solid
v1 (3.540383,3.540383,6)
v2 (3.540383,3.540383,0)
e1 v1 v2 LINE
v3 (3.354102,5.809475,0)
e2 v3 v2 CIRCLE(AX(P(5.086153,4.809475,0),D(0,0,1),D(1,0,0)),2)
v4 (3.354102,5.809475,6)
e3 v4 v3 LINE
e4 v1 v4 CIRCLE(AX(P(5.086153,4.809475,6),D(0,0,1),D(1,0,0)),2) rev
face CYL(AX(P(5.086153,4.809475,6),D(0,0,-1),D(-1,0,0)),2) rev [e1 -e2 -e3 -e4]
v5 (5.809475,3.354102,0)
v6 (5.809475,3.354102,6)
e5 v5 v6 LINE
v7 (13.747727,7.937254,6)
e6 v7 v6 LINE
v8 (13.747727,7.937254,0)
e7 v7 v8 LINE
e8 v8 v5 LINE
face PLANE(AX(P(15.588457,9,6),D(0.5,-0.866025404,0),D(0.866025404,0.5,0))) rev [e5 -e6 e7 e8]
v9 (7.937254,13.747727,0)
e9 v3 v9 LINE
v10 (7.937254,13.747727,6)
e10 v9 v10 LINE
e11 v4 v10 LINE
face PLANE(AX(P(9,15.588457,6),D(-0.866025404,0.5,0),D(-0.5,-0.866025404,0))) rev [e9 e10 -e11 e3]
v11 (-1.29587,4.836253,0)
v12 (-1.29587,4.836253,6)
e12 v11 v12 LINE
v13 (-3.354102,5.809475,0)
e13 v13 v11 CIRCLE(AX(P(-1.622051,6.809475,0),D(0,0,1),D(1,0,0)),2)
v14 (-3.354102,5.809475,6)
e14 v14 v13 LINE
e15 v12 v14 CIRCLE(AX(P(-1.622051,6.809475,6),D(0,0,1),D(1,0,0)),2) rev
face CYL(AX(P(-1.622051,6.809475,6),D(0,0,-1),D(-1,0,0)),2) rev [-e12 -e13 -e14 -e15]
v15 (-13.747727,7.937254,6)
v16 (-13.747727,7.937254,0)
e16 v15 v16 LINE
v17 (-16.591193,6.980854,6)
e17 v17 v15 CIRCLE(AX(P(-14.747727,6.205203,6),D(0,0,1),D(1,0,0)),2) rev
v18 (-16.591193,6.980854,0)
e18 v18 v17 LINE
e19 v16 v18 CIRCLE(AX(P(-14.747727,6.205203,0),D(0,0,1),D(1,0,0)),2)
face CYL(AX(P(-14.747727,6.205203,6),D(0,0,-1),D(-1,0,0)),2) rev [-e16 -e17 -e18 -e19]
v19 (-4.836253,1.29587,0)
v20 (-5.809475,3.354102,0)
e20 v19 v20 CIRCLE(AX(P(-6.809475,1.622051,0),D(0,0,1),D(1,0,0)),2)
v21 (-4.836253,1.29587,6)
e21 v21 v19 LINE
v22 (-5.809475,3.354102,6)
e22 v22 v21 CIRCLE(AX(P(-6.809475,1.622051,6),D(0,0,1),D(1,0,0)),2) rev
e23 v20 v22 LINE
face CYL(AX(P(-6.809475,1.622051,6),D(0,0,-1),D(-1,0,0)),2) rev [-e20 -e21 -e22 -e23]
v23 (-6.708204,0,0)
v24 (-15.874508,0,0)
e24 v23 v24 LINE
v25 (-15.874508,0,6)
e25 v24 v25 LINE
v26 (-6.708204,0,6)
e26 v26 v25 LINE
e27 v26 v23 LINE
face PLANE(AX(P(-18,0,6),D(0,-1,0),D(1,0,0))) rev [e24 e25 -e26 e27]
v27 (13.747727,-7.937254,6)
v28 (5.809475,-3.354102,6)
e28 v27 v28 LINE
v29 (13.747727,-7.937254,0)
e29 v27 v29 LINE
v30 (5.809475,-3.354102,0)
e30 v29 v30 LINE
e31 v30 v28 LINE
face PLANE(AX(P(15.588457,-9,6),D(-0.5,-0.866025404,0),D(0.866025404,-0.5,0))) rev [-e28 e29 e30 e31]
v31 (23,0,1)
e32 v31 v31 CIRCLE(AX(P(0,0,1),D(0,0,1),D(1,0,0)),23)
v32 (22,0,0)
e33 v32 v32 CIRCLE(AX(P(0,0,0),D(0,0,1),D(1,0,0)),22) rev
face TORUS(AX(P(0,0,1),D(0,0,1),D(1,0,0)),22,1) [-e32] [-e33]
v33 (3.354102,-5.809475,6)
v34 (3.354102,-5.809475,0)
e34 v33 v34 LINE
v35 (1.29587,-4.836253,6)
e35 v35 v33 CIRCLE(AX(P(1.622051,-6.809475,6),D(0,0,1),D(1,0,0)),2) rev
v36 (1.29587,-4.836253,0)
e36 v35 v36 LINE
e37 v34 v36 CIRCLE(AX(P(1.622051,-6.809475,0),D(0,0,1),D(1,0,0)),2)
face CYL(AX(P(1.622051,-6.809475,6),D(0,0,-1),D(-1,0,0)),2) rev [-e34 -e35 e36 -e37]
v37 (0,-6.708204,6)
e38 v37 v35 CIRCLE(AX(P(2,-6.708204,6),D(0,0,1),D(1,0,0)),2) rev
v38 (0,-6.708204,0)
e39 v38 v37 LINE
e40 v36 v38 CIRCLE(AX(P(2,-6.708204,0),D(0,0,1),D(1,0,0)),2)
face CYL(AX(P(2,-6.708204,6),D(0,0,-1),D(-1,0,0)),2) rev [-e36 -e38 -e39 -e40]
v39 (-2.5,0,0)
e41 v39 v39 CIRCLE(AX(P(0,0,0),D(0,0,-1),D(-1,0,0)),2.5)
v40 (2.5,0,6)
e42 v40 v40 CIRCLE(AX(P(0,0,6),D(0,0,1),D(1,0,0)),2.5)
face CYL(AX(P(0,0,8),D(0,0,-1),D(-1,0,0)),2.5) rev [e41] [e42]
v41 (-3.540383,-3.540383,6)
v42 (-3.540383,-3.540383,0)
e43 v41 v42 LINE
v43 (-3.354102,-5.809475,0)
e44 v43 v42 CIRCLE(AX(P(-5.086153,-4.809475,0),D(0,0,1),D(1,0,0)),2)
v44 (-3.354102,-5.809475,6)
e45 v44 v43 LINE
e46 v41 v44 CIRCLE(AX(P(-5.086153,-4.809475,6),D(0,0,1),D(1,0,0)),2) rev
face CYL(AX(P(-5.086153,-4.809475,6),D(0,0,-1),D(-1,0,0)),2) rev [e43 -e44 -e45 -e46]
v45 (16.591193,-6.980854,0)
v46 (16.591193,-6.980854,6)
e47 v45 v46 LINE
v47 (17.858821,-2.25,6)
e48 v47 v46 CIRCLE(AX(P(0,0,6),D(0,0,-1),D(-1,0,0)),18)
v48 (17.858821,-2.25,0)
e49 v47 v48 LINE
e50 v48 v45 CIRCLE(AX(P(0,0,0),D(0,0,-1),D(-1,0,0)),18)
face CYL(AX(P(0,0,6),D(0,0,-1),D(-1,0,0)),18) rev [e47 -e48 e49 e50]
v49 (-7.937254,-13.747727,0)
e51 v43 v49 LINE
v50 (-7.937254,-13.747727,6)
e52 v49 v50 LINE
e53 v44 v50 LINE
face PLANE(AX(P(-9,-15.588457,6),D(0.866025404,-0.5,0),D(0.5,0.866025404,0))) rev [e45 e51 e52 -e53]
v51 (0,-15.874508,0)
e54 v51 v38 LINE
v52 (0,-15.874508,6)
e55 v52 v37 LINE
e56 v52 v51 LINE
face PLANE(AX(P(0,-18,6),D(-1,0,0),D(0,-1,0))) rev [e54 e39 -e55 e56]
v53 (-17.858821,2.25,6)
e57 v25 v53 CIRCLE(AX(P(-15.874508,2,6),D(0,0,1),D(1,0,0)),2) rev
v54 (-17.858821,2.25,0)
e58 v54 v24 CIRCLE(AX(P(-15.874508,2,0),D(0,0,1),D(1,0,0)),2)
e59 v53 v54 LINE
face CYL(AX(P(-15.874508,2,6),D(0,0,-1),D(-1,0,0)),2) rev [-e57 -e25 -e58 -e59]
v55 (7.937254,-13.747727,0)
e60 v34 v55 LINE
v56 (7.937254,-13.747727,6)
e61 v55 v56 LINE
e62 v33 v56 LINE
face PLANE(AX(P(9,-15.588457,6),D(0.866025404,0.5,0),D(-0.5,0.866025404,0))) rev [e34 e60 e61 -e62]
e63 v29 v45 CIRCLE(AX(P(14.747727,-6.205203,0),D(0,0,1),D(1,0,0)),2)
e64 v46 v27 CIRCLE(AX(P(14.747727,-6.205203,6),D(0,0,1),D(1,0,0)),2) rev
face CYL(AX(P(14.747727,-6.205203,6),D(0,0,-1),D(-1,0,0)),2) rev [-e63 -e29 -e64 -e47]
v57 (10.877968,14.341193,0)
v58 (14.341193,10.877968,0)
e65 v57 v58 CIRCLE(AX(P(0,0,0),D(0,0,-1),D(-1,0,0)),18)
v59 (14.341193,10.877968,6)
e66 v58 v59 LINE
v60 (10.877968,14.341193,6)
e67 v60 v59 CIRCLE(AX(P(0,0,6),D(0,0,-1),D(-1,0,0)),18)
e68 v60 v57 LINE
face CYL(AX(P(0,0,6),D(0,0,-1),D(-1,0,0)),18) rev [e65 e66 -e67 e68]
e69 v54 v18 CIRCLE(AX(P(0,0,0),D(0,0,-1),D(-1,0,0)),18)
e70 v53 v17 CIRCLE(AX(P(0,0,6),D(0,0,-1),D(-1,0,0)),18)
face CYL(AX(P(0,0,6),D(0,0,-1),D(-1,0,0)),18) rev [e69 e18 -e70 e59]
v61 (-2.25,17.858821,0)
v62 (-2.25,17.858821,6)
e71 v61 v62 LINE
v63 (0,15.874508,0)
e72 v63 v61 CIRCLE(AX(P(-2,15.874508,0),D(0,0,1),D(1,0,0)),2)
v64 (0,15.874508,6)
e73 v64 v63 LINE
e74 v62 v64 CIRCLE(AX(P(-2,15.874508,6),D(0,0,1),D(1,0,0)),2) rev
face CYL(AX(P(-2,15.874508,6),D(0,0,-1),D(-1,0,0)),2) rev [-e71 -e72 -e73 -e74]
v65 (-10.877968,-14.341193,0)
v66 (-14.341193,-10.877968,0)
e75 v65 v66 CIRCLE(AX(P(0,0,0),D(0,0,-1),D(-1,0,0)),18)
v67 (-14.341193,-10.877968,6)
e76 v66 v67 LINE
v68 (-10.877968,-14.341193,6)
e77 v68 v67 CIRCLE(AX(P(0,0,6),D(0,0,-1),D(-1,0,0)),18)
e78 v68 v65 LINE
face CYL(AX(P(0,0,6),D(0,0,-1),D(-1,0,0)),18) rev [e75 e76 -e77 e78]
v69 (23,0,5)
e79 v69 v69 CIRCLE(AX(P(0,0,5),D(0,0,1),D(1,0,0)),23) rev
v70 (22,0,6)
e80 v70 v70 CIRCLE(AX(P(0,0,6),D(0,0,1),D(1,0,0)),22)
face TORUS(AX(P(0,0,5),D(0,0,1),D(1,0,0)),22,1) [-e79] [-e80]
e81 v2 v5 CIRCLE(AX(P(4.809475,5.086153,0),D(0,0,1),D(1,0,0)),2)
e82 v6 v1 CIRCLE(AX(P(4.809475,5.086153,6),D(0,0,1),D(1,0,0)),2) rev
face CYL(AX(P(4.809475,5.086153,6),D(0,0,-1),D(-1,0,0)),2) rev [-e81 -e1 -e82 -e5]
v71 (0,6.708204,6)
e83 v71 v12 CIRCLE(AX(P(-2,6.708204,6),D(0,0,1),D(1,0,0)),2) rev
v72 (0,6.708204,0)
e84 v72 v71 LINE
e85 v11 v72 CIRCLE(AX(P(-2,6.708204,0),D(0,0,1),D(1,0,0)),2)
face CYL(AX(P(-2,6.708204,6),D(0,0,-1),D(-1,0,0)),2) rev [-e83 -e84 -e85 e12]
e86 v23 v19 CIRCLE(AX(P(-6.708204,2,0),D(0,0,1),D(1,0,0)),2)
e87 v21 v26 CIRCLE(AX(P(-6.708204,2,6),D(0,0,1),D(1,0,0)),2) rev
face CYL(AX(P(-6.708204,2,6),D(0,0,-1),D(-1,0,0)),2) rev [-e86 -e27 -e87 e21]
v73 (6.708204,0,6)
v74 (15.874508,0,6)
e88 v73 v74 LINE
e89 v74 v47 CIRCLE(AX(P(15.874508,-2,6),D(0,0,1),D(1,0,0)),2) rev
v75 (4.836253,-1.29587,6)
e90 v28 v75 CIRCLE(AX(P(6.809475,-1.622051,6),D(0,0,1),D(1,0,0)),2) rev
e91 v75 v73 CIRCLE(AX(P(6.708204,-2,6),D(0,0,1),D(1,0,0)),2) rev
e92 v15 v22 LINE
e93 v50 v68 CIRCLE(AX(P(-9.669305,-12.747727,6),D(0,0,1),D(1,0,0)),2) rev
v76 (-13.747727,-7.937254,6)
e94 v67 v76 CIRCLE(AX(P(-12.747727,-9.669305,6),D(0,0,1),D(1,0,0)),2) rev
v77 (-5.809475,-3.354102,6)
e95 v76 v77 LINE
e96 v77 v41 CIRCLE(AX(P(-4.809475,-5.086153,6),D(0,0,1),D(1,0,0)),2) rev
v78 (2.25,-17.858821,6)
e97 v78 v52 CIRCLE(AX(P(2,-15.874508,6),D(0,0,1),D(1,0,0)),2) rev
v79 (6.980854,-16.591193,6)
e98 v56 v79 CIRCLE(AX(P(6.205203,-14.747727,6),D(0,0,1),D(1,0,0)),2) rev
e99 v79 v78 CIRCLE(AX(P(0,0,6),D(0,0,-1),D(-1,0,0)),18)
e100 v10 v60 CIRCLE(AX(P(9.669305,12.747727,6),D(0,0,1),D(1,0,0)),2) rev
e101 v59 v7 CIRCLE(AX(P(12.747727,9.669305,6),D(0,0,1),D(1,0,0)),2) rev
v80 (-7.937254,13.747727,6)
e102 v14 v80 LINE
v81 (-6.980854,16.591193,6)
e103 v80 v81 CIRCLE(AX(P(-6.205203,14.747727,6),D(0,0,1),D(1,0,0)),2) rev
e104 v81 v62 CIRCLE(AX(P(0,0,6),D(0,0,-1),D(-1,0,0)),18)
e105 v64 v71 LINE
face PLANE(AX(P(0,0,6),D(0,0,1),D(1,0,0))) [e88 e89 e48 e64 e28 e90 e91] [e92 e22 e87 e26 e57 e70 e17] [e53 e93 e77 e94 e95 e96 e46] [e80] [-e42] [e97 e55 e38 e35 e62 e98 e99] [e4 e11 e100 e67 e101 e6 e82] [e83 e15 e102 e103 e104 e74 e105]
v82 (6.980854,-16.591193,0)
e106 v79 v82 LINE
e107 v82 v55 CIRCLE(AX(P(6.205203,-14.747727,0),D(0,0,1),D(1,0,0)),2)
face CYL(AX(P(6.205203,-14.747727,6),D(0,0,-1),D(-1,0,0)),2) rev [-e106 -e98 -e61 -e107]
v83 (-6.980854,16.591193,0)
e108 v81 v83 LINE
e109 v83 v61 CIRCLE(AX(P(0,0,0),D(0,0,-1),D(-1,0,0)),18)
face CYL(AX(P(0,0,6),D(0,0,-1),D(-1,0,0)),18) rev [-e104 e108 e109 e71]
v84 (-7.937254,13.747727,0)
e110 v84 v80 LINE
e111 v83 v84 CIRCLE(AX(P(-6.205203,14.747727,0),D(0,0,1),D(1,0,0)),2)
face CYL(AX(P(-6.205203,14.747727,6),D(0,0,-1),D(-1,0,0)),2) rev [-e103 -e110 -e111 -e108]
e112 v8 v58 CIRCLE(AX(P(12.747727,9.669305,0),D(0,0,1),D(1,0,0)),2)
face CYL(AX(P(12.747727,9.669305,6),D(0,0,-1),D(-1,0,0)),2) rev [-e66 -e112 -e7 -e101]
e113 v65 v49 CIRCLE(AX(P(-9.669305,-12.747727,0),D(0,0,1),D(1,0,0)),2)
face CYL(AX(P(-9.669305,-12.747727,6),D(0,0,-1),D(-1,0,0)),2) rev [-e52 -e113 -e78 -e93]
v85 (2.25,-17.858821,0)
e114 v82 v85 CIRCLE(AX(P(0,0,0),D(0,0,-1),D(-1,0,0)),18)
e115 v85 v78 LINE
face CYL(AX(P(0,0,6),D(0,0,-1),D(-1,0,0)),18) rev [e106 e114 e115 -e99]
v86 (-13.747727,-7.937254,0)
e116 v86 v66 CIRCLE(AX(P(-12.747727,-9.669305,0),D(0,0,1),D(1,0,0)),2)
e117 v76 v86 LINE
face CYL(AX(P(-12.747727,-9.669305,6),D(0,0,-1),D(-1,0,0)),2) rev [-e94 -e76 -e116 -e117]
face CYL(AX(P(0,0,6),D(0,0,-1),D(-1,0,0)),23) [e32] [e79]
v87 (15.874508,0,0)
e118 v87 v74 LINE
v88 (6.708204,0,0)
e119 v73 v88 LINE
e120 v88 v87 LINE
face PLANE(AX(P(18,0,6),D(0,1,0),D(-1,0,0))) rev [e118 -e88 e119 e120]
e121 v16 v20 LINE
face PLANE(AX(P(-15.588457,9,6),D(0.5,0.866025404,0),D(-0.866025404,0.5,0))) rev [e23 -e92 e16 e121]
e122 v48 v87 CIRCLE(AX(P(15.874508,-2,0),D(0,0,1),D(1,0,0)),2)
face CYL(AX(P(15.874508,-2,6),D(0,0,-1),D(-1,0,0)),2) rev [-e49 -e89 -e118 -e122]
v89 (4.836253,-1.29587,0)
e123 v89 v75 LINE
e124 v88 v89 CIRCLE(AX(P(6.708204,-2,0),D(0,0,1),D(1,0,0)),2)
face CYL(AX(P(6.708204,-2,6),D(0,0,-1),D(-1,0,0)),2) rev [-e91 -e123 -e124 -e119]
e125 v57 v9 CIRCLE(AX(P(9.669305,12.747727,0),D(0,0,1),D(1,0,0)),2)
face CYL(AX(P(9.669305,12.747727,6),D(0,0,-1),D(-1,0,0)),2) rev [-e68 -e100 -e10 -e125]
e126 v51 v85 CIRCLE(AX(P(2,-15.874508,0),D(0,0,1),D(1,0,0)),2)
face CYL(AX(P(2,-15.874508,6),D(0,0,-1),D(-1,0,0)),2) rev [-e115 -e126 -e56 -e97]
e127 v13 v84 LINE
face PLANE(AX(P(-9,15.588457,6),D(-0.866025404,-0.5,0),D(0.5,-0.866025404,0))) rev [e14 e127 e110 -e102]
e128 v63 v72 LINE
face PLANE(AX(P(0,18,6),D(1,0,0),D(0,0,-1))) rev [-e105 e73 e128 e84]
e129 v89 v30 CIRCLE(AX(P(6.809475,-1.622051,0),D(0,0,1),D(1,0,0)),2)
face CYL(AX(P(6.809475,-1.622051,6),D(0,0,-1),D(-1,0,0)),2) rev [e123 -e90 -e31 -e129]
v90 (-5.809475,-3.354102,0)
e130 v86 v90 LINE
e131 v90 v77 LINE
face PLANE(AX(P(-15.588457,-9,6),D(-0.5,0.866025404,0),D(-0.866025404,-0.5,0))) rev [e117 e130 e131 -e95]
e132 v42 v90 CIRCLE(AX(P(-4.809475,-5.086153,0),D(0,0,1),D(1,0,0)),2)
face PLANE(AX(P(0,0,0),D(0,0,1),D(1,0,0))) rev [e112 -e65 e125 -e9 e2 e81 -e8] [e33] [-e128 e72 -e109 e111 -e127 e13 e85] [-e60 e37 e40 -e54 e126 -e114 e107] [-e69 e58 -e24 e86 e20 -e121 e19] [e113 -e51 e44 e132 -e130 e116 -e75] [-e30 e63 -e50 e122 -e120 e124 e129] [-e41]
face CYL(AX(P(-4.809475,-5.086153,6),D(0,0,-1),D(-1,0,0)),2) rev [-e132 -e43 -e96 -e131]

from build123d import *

# Parameters (mm, degrees)
SKETCH1_R           = 23
BOSS_EXTRUDE1_DEPTH = 6
FILLET1_R           = 1
CUT_EXTRUDE1_DEPTH  = 34.075670817082454
SKETCH3_R           = 2.5
CUT_EXTRUDE2_DEPTH  = 8
FILLET2_R           = 2


with BuildPart() as part:
    # Sketch1 → Boss-Extrude1 (new body)
    with BuildSketch(Plane.XY):
        Circle(SKETCH1_R)
    extrude(amount=BOSS_EXTRUDE1_DEPTH)

    # Fillet1
    fillet1_edges = [part.edges().sort_by_distance(p)[0] for p in [
        (-23, 2.82e-15, 0),
        (-23, 2.82e-15, 6),
    ]]
    fillet(fillet1_edges, radius=FILLET1_R)

    # Sketch2 → Cut-Extrude1 (cut, through all)
    with BuildSketch(Plane(origin=(0, 0, 0), x_dir=(-1, 0, 0), z_dir=(0, 0, -1))):
        with BuildLine():
            Line((0, 18), (0, 4.999999999999997))
            ThreePointArc((0, 4.999999999999997), (1.2940952255126064, 4.829629131445338), (2.500000000000004, 4.330127018922188))
            Line((2.500000000000004, 4.330127018922188), (9.000000000000016, 15.588457268119884))
            ThreePointArc((9.000000000000016, 15.588457268119884), (4.658742811845384, 17.386664873203223), (0, 18))
        make_face()
        with BuildLine():
            Line((15.588457268119916, 8.999999999999963), (4.330127018922196, 2.499999999999989))
            ThreePointArc((4.330127018922196, 2.499999999999989), (4.829629131445343, 1.294095225512589), (4.999999999999997, -1.746e-14))
            Line((4.999999999999997, -1.746e-14), (18, -6.285e-14))
            ThreePointArc((18, -6.285e-14), (17.386664873203244, 4.658742811845323), (15.588457268119916, 8.999999999999963))
        make_face()
        with BuildLine():
            Line((15.588457268119898, -8.999999999999995), (4.330127018922192, -2.4999999999999973))
            ThreePointArc((4.330127018922192, -2.4999999999999973), (3.5355339059327373, -3.5355339059327355), (2.500000000000001, -4.330127018922191))
            Line((2.500000000000001, -4.330127018922191), (9.000000000000007, -15.588457268119889))
            ThreePointArc((9.000000000000007, -15.588457268119889), (12.72792206135786, -12.727922061357848), (15.588457268119898, -8.999999999999995))
        make_face()
        with BuildLine():
            Line((3.97e-15, -18), (9.6e-16, -4.999999999999997))
            ThreePointArc((9.6e-16, -4.999999999999997), (-1.2940952255126013, -4.82962913144534), (-2.499999999999997, -4.330127018922192))
            Line((-2.499999999999997, -4.330127018922192), (-8.999999999999993, -15.588457268119898))
            ThreePointArc((-8.999999999999993, -15.588457268119898), (-4.658742811845367, -17.38666487320323), (3.97e-15, -18))
        make_face()
        with BuildLine():
            Line((-15.588457268119889, -9.000000000000009), (-4.330127018922191, -2.5000000000000013))
            ThreePointArc((-4.330127018922191, -2.5000000000000013), (-4.829629131445345, -1.2940952255125773), (-4.9999999999999964, 5.237e-14))
            Line((-4.9999999999999964, 5.237e-14), (-18, 5.83e-15))
            ThreePointArc((-18, 5.83e-15), (-17.38666487320323, -4.658742811845374), (-15.588457268119889, -9.000000000000009))
        make_face()
        with BuildLine():
            Line((-15.58845726811979, 9.000000000000181), (-4.330127018922163, 2.500000000000049))
            ThreePointArc((-4.330127018922163, 2.500000000000049), (-3.5355339059326933, 3.5355339059327786), (-2.499999999999943, 4.330127018922223))
            Line((-2.499999999999943, 4.330127018922223), (-8.9999999999998, 15.588457268120008))
            ThreePointArc((-8.9999999999998, 15.588457268120008), (-12.7279220613577, 12.727922061358008), (-15.58845726811979, 9.000000000000181))
        make_face()
    extrude(amount=-CUT_EXTRUDE1_DEPTH, mode=Mode.SUBTRACT)

    # Sketch3 → Cut-Extrude2 (cut)
    with BuildSketch(Plane(origin=(0, 0, 0), x_dir=(-1, 0, 0), z_dir=(0, 0, -1))):
        Circle(SKETCH3_R)
    extrude(amount=-CUT_EXTRUDE2_DEPTH, mode=Mode.SUBTRACT)

    # Fillet2
    # the kernel refuses this fillet: 2 mm, written as the material it adds along each edge
    with BuildSketch(Plane(origin=(8.9999999999998, 15.58845726812001, 0), x_dir=(0.8330141641507608, -0.5532516627396699, 0), z_dir=(0, 0, 1))) as fillet2_piece_1:
        with BuildLine():
            CenterArc((2.1291790264677095, -1.996074518473306), FILLET2_R, 86.40962210927087, 97.18075578145812)
            Line((0.13310450799440263, -2.121320343559637), (0, 0))
            ThreePointArc((0, 0), (1.127212425777022, 0.03532933374024082), (2.2544248515540453, -1.2e-16))
        make_face()
    extrude(amount=6)
    with BuildSketch(Plane(origin=(15.58845726811979, 9.000000000000181, 0), x_dir=(-0.5532516627396912, 0.8330141641507466, 0), z_dir=(0, 0, 1))) as fillet2_piece_2:
        with BuildLine():
            CenterArc((2.1291790264677095, 1.9960745184733064), FILLET2_R, 176.40962210927088, 97.18075578145823)
            Line((0.13310450799440354, 2.1213203435596415), (0, 0))
            ThreePointArc((0, 0), (1.127212425777022, -0.03532933374024257), (2.2544248515540453, 9e-17))
        make_face()
    extrude(amount=6)
    with BuildSketch(Plane(origin=(2.499999999999943, 4.330127018922223, 0), x_dir=(0.4999999999999891, 0.8660254037844449, 0), z_dir=(0, 0, 1))) as fillet2_piece_3:
        with BuildLine():
            CenterArc((1.7082039324998066, -1.9999999999999998), FILLET2_R, 90.00000000000001, 73.39845040098082)
            ThreePointArc((-0.2084257625000237, -1.4285714285714644), (-0.05238081560950268, -0.7218479107478997), (0, 0))
            Line((0, 0), (1.7082039324998062, 0))
        make_face()
    extrude(amount=6)
    with BuildSketch(Plane(origin=(4.330127018922163, 2.5000000000000484, 0), x_dir=(0.8660254037844327, 0.5000000000000103, 0), z_dir=(0, 0, 1))) as fillet2_piece_4:
        with BuildLine():
            CenterArc((1.708203932499807, 2), FILLET2_R, 196.6015495990192, 73.39845040098078)
            ThreePointArc((-0.20842576250002318, 1.428571428571463), (-0.05238081560950245, 0.7218479107478992), (0, 0))
            Line((0, 0), (1.7082039324998068, -6e-17))
        make_face()
    extrude(amount=6)
    with BuildSketch(Plane(origin=(15.588457268119889, -9.000000000000009, 0), x_dir=(-0.8660254037844383, 0.5000000000000009, 0), z_dir=(0, 0, 1))) as fillet2_piece_5:
        with BuildLine():
            CenterArc((2.1254921336124535, -2), FILLET2_R, 89.99999999999999, 97.18075578145834)
            ThreePointArc((0.14117865031401003, -2.250000000000001), (0.03532933374023933, -1.1272124257770224), (0, 0))
            Line((0, 0), (2.125492133612454, -1.1e-16))
        make_face()
    extrude(amount=6)
    with BuildSketch(Plane(origin=(18, 5.83e-15, 0), x_dir=(-1, 3.63e-15, 0), z_dir=(0, 0, 1))) as fillet2_piece_6:
        with BuildLine():
            CenterArc((2.1254921336124433, 2), FILLET2_R, 172.81924421854202, 97.18075578145795)
            ThreePointArc((0.14117865031399895, 2.2499999999999902), (0.03532933374023574, 1.1272124257770182), (0, 0))
            Line((0, 0), (2.1254921336124433, 0))
        make_face()
    extrude(amount=6)
    with BuildSketch(Plane(origin=(4.330127018922191, -2.5000000000000018, 0), x_dir=(0.36973419276377445, 0.9291375714614709, 0), z_dir=(0, 0, 1))) as fillet2_piece_7:
        with BuildLine():
            CenterArc((1.7324349857948858, -1.9790476737562004), FILLET2_R, 98.30077479950961, 73.39845040099217)
            Line((-0.2466126879613723, -1.690308509457446), (0, 0))
            ThreePointArc((0, 0), (0.7218479107478688, -0.05238081560949556), (1.4436958214957383, 0))
        make_face()
    extrude(amount=6)
    with BuildSketch(Plane(origin=(4.9999999999999964, 5.25e-14, 0), x_dir=(-0.14436958214956583, -0.9895238368781015, 0), z_dir=(0, 0, 1))) as fillet2_piece_8:
        with BuildLine():
            CenterArc((1.7324349857949062, 1.9790476737562006), FILLET2_R, 188.3007747994978, 73.39845040099254)
            Line((-0.246612687961354, 1.6903085094574617), (0, 0))
            ThreePointArc((0, 0), (0.7218479107478792, 0.05238081560949936), (1.4436958214957574, 0))
        make_face()
    extrude(amount=6)
    with BuildSketch(Plane(origin=(-3.43e-15, -18, 0), x_dir=(0.9980372592366533, 0.06262291254316825, 0), z_dir=(0, 0, 1))) as fillet2_piece_9:
        with BuildLine():
            CenterArc((2.129179026467711, 1.996074518473307), FILLET2_R, 176.4096221092709, 97.18075578145829)
            Line((0.13310450799440432, 2.121320343559642), (0, 0))
            ThreePointArc((0, 0), (1.1272124257770224, -0.03532933374023745), (2.254424851554048, 3e-17))
        make_face()
    extrude(amount=6)
    with BuildSketch(Plane(origin=(8.999999999999993, -15.588457268119898, 0), x_dir=(-0.8956370766939215, -0.44478559649697147, 0), z_dir=(0, 0, 1))) as fillet2_piece_10:
        with BuildLine():
            CenterArc((2.129179026467713, -1.9960745184733077), FILLET2_R, 86.40962210927084, 97.1807557814584)
            Line((0.1331045079944061, -2.121320343559647), (0, 0))
            ThreePointArc((0, 0), (1.1272124257770244, 0.03532933374023982), (2.2544248515540497, 8e-17))
        make_face()
    extrude(amount=6)
    with BuildSketch(Plane(origin=(2.4999999999999973, -4.330127018922191, 0), x_dir=(0.4999999999999994, -0.8660254037844389, 0), z_dir=(0, 0, 1))) as fillet2_piece_11:
        with BuildLine():
            CenterArc((1.7082039324998068, -1.9999999999999998), FILLET2_R, 90.00000000000001, 73.39845040098074)
            ThreePointArc((-0.20842576250002273, -1.428571428571461), (-0.05238081560950084, -0.7218479107478981), (0, 0))
            Line((0, 0), (1.7082039324998066, 2e-17))
        make_face()
    extrude(amount=6)
    with BuildSketch(Plane(origin=(-9.6e-16, -4.9999999999999964, 0), x_dir=(-2.2e-16, -1, 0), z_dir=(0, 0, 1))) as fillet2_piece_12:
        with BuildLine():
            CenterArc((1.7082039324998068, 2), FILLET2_R, 196.6015495990192, 73.39845040098078)
            ThreePointArc((-0.2084257625000235, 1.4285714285714635), (-0.0523808156095013, 0.7218479107478993), (0, 0))
            Line((0, 0), (1.7082039324998064, 0))
        make_face()
    extrude(amount=6)
    with BuildSketch(Plane(origin=(-9.000000000000007, -15.588457268119889, 0), x_dir=(-0.8330141641507522, 0.5532516627396828, 0), z_dir=(0, 0, 1))) as fillet2_piece_13:
        with BuildLine():
            CenterArc((2.1291790264677144, -1.9960745184733075), FILLET2_R, 86.40962210927094, 97.18075578145817)
            Line((0.13310450799440787, -2.121320343559643), (0, 0))
            ThreePointArc((0, 0), (1.1272124257770235, 0.03532933374024261), (2.2544248515540475, 4e-17))
        make_face()
    extrude(amount=6)
    with BuildSketch(Plane(origin=(-2.500000000000001, -4.330127018922191, 0), x_dir=(-0.5000000000000007, -0.8660254037844384, 0), z_dir=(0, 0, 1))) as fillet2_piece_14:
        with BuildLine():
            CenterArc((1.7082039324998013, -2), FILLET2_R, 90.00000000000001, 73.39845040098085)
            ThreePointArc((-0.20842576250002953, -1.428571428571465), (-0.05238081560950266, -0.7218479107479008), (0, 0))
            Line((0, 0), (1.7082039324998008, -1e-17))
        make_face()
    extrude(amount=6)
    with BuildSketch(Plane(origin=(-4.330127018922191, -2.4999999999999973, 0), x_dir=(-0.8660254037844389, -0.4999999999999994, 0), z_dir=(0, 0, 1))) as fillet2_piece_15:
        with BuildLine():
            CenterArc((1.7082039324998053, 2), FILLET2_R, 196.60154959901914, 73.39845040098089)
            ThreePointArc((-0.20842576250002512, 1.428571428571465), (-0.05238081560950129, 0.7218479107479002), (0, 0))
            Line((0, 0), (1.7082039324998066, -2e-17))
        make_face()
    extrude(amount=6)
    with BuildSketch(Plane(origin=(-15.588457268119896, -8.999999999999996, 0), x_dir=(0.5532516627396812, -0.8330141641507532, 0), z_dir=(0, 0, 1))) as fillet2_piece_16:
        with BuildLine():
            CenterArc((2.129179026467709, 1.996074518473306), FILLET2_R, 176.4096221092708, 97.18075578145829)
            Line((0.1331045079944023, 2.1213203435596437), (0, 0))
            ThreePointArc((0, 0), (1.127212425777022, -0.03532933374023939), (2.2544248515540444, -1.1e-16))
        make_face()
    extrude(amount=6)
    with BuildSketch(Plane(origin=(-4.999999999999998, -1.714e-14, 0), x_dir=(-1, -3.62e-15, 0), z_dir=(0, 0, 1))) as fillet2_piece_17:
        with BuildLine():
            CenterArc((1.7082039324997937, -2), FILLET2_R, 90, 73.39845040098072)
            ThreePointArc((-0.20842576250003547, -1.4285714285714597), (-0.05238081560950375, -0.7218479107478981), (0, 0))
            Line((0, 0), (1.708203932499794, 0))
        make_face()
    extrude(amount=6)
    with BuildSketch(Plane(origin=(-4.330127018922196, 2.499999999999989, 0), x_dir=(-0.8660254037844398, 0.49999999999999784, 0), z_dir=(0, 0, 1))) as fillet2_piece_18:
        with BuildLine():
            CenterArc((1.7082039324998106, 2), FILLET2_R, 196.60154959901917, 73.39845040098083)
            ThreePointArc((-0.20842576250002, 1.4285714285714646), (-0.05238081560950151, 0.7218479107478999), (0, 0))
            Line((0, 0), (1.708203932499811, -2e-17))
        make_face()
    extrude(amount=6)
    with BuildSketch(Plane(origin=(-18, -6.285e-14, 0), x_dir=(0.06262291254316511, 0.9980372592366534, 0), z_dir=(0, 0, 1))) as fillet2_piece_19:
        with BuildLine():
            CenterArc((2.129179026467712, -1.996074518473306), FILLET2_R, 86.4096221092709, 97.18075578145834)
            Line((0.13310450799440612, -2.121320343559647), (0, 0))
            ThreePointArc((0, 0), (1.1272124257770233, 0.0353293337402411), (2.254424851554047, 0))
        make_face()
    extrude(amount=6)
    with BuildSketch(Plane(origin=(-15.588457268119917, 8.999999999999963, 0), x_dir=(-0.4447855964969697, -0.8956370766939222, 0), z_dir=(0, 0, 1))) as fillet2_piece_20:
        with BuildLine():
            CenterArc((2.1291790264677113, 1.9960745184733066), FILLET2_R, 176.40962210927077, 97.18075578145834)
            Line((0.13310450799440465, 2.1213203435596455), (0, 0))
            ThreePointArc((0, 0), (1.1272124257770235, -0.03532933374024044), (2.254424851554046, -6e-17))
        make_face()
    extrude(amount=6)
    with BuildSketch(Plane(origin=(-2.2e-16, 18, 0), x_dir=(-0.9980372592366533, -0.06262291254316824, 0), z_dir=(0, 0, 1))) as fillet2_piece_21:
        with BuildLine():
            CenterArc((2.1291790264677126, 1.996074518473307), FILLET2_R, 176.40962210927086, 97.18075578145829)
            Line((0.13310450799440565, 2.1213203435596437), (0, 0))
            ThreePointArc((0, 0), (1.1272124257770244, -0.03532933374024468), (2.254424851554049, 0))
        make_face()
    extrude(amount=6)
    with BuildSketch(Plane(origin=(-9.000000000000018, 15.588457268119885, 0), x_dir=(0.5000000000000014, -0.8660254037844377, 0), z_dir=(0, 0, 1))) as fillet2_piece_22:
        with BuildLine():
            CenterArc((2.125492133612456, 2), FILLET2_R, 172.81924421854168, 97.18075578145829)
            ThreePointArc((0.1411786503140125, 2.2500000000000018), (0.03532933374024108, 1.1272124257770235), (0, 0))
            Line((0, 0), (2.1254921336124544, 1.2e-16))
        make_face()
    extrude(amount=6)
    with BuildSketch(Plane(origin=(0, 4.9999999999999964, 0), x_dir=(-0.9895238368781003, -0.14436958214957385, 0), z_dir=(0, 0, 1))) as fillet2_piece_23:
        with BuildLine():
            CenterArc((1.732434985794886, -1.9790476737562013), FILLET2_R, 98.30077479950961, 73.39845040099226)
            Line((-0.24661268796137278, -1.6903085094574508), (0, 0))
            ThreePointArc((0, 0), (0.7218479107478691, -0.05238081560949842), (1.4436958214957385, -2e-17))
        make_face()
    extrude(amount=6)
    with BuildSketch(Plane(origin=(-2.500000000000004, 4.330127018922187, 0), x_dir=(-0.5000000000000007, 0.8660254037844383, 0), z_dir=(0, 0, 1))) as fillet2_piece_24:
        with BuildLine():
            CenterArc((1.7082039324998055, -2), FILLET2_R, 90.00000000000001, 73.39845040098085)
            ThreePointArc((-0.20842576250002545, -1.4285714285714655), (-0.05238081560950322, -0.7218479107479004), (0, 0))
            Line((0, 0), (1.708203932499805, 1e-17))
        make_face()
    extrude(amount=6)


solid = part.part
